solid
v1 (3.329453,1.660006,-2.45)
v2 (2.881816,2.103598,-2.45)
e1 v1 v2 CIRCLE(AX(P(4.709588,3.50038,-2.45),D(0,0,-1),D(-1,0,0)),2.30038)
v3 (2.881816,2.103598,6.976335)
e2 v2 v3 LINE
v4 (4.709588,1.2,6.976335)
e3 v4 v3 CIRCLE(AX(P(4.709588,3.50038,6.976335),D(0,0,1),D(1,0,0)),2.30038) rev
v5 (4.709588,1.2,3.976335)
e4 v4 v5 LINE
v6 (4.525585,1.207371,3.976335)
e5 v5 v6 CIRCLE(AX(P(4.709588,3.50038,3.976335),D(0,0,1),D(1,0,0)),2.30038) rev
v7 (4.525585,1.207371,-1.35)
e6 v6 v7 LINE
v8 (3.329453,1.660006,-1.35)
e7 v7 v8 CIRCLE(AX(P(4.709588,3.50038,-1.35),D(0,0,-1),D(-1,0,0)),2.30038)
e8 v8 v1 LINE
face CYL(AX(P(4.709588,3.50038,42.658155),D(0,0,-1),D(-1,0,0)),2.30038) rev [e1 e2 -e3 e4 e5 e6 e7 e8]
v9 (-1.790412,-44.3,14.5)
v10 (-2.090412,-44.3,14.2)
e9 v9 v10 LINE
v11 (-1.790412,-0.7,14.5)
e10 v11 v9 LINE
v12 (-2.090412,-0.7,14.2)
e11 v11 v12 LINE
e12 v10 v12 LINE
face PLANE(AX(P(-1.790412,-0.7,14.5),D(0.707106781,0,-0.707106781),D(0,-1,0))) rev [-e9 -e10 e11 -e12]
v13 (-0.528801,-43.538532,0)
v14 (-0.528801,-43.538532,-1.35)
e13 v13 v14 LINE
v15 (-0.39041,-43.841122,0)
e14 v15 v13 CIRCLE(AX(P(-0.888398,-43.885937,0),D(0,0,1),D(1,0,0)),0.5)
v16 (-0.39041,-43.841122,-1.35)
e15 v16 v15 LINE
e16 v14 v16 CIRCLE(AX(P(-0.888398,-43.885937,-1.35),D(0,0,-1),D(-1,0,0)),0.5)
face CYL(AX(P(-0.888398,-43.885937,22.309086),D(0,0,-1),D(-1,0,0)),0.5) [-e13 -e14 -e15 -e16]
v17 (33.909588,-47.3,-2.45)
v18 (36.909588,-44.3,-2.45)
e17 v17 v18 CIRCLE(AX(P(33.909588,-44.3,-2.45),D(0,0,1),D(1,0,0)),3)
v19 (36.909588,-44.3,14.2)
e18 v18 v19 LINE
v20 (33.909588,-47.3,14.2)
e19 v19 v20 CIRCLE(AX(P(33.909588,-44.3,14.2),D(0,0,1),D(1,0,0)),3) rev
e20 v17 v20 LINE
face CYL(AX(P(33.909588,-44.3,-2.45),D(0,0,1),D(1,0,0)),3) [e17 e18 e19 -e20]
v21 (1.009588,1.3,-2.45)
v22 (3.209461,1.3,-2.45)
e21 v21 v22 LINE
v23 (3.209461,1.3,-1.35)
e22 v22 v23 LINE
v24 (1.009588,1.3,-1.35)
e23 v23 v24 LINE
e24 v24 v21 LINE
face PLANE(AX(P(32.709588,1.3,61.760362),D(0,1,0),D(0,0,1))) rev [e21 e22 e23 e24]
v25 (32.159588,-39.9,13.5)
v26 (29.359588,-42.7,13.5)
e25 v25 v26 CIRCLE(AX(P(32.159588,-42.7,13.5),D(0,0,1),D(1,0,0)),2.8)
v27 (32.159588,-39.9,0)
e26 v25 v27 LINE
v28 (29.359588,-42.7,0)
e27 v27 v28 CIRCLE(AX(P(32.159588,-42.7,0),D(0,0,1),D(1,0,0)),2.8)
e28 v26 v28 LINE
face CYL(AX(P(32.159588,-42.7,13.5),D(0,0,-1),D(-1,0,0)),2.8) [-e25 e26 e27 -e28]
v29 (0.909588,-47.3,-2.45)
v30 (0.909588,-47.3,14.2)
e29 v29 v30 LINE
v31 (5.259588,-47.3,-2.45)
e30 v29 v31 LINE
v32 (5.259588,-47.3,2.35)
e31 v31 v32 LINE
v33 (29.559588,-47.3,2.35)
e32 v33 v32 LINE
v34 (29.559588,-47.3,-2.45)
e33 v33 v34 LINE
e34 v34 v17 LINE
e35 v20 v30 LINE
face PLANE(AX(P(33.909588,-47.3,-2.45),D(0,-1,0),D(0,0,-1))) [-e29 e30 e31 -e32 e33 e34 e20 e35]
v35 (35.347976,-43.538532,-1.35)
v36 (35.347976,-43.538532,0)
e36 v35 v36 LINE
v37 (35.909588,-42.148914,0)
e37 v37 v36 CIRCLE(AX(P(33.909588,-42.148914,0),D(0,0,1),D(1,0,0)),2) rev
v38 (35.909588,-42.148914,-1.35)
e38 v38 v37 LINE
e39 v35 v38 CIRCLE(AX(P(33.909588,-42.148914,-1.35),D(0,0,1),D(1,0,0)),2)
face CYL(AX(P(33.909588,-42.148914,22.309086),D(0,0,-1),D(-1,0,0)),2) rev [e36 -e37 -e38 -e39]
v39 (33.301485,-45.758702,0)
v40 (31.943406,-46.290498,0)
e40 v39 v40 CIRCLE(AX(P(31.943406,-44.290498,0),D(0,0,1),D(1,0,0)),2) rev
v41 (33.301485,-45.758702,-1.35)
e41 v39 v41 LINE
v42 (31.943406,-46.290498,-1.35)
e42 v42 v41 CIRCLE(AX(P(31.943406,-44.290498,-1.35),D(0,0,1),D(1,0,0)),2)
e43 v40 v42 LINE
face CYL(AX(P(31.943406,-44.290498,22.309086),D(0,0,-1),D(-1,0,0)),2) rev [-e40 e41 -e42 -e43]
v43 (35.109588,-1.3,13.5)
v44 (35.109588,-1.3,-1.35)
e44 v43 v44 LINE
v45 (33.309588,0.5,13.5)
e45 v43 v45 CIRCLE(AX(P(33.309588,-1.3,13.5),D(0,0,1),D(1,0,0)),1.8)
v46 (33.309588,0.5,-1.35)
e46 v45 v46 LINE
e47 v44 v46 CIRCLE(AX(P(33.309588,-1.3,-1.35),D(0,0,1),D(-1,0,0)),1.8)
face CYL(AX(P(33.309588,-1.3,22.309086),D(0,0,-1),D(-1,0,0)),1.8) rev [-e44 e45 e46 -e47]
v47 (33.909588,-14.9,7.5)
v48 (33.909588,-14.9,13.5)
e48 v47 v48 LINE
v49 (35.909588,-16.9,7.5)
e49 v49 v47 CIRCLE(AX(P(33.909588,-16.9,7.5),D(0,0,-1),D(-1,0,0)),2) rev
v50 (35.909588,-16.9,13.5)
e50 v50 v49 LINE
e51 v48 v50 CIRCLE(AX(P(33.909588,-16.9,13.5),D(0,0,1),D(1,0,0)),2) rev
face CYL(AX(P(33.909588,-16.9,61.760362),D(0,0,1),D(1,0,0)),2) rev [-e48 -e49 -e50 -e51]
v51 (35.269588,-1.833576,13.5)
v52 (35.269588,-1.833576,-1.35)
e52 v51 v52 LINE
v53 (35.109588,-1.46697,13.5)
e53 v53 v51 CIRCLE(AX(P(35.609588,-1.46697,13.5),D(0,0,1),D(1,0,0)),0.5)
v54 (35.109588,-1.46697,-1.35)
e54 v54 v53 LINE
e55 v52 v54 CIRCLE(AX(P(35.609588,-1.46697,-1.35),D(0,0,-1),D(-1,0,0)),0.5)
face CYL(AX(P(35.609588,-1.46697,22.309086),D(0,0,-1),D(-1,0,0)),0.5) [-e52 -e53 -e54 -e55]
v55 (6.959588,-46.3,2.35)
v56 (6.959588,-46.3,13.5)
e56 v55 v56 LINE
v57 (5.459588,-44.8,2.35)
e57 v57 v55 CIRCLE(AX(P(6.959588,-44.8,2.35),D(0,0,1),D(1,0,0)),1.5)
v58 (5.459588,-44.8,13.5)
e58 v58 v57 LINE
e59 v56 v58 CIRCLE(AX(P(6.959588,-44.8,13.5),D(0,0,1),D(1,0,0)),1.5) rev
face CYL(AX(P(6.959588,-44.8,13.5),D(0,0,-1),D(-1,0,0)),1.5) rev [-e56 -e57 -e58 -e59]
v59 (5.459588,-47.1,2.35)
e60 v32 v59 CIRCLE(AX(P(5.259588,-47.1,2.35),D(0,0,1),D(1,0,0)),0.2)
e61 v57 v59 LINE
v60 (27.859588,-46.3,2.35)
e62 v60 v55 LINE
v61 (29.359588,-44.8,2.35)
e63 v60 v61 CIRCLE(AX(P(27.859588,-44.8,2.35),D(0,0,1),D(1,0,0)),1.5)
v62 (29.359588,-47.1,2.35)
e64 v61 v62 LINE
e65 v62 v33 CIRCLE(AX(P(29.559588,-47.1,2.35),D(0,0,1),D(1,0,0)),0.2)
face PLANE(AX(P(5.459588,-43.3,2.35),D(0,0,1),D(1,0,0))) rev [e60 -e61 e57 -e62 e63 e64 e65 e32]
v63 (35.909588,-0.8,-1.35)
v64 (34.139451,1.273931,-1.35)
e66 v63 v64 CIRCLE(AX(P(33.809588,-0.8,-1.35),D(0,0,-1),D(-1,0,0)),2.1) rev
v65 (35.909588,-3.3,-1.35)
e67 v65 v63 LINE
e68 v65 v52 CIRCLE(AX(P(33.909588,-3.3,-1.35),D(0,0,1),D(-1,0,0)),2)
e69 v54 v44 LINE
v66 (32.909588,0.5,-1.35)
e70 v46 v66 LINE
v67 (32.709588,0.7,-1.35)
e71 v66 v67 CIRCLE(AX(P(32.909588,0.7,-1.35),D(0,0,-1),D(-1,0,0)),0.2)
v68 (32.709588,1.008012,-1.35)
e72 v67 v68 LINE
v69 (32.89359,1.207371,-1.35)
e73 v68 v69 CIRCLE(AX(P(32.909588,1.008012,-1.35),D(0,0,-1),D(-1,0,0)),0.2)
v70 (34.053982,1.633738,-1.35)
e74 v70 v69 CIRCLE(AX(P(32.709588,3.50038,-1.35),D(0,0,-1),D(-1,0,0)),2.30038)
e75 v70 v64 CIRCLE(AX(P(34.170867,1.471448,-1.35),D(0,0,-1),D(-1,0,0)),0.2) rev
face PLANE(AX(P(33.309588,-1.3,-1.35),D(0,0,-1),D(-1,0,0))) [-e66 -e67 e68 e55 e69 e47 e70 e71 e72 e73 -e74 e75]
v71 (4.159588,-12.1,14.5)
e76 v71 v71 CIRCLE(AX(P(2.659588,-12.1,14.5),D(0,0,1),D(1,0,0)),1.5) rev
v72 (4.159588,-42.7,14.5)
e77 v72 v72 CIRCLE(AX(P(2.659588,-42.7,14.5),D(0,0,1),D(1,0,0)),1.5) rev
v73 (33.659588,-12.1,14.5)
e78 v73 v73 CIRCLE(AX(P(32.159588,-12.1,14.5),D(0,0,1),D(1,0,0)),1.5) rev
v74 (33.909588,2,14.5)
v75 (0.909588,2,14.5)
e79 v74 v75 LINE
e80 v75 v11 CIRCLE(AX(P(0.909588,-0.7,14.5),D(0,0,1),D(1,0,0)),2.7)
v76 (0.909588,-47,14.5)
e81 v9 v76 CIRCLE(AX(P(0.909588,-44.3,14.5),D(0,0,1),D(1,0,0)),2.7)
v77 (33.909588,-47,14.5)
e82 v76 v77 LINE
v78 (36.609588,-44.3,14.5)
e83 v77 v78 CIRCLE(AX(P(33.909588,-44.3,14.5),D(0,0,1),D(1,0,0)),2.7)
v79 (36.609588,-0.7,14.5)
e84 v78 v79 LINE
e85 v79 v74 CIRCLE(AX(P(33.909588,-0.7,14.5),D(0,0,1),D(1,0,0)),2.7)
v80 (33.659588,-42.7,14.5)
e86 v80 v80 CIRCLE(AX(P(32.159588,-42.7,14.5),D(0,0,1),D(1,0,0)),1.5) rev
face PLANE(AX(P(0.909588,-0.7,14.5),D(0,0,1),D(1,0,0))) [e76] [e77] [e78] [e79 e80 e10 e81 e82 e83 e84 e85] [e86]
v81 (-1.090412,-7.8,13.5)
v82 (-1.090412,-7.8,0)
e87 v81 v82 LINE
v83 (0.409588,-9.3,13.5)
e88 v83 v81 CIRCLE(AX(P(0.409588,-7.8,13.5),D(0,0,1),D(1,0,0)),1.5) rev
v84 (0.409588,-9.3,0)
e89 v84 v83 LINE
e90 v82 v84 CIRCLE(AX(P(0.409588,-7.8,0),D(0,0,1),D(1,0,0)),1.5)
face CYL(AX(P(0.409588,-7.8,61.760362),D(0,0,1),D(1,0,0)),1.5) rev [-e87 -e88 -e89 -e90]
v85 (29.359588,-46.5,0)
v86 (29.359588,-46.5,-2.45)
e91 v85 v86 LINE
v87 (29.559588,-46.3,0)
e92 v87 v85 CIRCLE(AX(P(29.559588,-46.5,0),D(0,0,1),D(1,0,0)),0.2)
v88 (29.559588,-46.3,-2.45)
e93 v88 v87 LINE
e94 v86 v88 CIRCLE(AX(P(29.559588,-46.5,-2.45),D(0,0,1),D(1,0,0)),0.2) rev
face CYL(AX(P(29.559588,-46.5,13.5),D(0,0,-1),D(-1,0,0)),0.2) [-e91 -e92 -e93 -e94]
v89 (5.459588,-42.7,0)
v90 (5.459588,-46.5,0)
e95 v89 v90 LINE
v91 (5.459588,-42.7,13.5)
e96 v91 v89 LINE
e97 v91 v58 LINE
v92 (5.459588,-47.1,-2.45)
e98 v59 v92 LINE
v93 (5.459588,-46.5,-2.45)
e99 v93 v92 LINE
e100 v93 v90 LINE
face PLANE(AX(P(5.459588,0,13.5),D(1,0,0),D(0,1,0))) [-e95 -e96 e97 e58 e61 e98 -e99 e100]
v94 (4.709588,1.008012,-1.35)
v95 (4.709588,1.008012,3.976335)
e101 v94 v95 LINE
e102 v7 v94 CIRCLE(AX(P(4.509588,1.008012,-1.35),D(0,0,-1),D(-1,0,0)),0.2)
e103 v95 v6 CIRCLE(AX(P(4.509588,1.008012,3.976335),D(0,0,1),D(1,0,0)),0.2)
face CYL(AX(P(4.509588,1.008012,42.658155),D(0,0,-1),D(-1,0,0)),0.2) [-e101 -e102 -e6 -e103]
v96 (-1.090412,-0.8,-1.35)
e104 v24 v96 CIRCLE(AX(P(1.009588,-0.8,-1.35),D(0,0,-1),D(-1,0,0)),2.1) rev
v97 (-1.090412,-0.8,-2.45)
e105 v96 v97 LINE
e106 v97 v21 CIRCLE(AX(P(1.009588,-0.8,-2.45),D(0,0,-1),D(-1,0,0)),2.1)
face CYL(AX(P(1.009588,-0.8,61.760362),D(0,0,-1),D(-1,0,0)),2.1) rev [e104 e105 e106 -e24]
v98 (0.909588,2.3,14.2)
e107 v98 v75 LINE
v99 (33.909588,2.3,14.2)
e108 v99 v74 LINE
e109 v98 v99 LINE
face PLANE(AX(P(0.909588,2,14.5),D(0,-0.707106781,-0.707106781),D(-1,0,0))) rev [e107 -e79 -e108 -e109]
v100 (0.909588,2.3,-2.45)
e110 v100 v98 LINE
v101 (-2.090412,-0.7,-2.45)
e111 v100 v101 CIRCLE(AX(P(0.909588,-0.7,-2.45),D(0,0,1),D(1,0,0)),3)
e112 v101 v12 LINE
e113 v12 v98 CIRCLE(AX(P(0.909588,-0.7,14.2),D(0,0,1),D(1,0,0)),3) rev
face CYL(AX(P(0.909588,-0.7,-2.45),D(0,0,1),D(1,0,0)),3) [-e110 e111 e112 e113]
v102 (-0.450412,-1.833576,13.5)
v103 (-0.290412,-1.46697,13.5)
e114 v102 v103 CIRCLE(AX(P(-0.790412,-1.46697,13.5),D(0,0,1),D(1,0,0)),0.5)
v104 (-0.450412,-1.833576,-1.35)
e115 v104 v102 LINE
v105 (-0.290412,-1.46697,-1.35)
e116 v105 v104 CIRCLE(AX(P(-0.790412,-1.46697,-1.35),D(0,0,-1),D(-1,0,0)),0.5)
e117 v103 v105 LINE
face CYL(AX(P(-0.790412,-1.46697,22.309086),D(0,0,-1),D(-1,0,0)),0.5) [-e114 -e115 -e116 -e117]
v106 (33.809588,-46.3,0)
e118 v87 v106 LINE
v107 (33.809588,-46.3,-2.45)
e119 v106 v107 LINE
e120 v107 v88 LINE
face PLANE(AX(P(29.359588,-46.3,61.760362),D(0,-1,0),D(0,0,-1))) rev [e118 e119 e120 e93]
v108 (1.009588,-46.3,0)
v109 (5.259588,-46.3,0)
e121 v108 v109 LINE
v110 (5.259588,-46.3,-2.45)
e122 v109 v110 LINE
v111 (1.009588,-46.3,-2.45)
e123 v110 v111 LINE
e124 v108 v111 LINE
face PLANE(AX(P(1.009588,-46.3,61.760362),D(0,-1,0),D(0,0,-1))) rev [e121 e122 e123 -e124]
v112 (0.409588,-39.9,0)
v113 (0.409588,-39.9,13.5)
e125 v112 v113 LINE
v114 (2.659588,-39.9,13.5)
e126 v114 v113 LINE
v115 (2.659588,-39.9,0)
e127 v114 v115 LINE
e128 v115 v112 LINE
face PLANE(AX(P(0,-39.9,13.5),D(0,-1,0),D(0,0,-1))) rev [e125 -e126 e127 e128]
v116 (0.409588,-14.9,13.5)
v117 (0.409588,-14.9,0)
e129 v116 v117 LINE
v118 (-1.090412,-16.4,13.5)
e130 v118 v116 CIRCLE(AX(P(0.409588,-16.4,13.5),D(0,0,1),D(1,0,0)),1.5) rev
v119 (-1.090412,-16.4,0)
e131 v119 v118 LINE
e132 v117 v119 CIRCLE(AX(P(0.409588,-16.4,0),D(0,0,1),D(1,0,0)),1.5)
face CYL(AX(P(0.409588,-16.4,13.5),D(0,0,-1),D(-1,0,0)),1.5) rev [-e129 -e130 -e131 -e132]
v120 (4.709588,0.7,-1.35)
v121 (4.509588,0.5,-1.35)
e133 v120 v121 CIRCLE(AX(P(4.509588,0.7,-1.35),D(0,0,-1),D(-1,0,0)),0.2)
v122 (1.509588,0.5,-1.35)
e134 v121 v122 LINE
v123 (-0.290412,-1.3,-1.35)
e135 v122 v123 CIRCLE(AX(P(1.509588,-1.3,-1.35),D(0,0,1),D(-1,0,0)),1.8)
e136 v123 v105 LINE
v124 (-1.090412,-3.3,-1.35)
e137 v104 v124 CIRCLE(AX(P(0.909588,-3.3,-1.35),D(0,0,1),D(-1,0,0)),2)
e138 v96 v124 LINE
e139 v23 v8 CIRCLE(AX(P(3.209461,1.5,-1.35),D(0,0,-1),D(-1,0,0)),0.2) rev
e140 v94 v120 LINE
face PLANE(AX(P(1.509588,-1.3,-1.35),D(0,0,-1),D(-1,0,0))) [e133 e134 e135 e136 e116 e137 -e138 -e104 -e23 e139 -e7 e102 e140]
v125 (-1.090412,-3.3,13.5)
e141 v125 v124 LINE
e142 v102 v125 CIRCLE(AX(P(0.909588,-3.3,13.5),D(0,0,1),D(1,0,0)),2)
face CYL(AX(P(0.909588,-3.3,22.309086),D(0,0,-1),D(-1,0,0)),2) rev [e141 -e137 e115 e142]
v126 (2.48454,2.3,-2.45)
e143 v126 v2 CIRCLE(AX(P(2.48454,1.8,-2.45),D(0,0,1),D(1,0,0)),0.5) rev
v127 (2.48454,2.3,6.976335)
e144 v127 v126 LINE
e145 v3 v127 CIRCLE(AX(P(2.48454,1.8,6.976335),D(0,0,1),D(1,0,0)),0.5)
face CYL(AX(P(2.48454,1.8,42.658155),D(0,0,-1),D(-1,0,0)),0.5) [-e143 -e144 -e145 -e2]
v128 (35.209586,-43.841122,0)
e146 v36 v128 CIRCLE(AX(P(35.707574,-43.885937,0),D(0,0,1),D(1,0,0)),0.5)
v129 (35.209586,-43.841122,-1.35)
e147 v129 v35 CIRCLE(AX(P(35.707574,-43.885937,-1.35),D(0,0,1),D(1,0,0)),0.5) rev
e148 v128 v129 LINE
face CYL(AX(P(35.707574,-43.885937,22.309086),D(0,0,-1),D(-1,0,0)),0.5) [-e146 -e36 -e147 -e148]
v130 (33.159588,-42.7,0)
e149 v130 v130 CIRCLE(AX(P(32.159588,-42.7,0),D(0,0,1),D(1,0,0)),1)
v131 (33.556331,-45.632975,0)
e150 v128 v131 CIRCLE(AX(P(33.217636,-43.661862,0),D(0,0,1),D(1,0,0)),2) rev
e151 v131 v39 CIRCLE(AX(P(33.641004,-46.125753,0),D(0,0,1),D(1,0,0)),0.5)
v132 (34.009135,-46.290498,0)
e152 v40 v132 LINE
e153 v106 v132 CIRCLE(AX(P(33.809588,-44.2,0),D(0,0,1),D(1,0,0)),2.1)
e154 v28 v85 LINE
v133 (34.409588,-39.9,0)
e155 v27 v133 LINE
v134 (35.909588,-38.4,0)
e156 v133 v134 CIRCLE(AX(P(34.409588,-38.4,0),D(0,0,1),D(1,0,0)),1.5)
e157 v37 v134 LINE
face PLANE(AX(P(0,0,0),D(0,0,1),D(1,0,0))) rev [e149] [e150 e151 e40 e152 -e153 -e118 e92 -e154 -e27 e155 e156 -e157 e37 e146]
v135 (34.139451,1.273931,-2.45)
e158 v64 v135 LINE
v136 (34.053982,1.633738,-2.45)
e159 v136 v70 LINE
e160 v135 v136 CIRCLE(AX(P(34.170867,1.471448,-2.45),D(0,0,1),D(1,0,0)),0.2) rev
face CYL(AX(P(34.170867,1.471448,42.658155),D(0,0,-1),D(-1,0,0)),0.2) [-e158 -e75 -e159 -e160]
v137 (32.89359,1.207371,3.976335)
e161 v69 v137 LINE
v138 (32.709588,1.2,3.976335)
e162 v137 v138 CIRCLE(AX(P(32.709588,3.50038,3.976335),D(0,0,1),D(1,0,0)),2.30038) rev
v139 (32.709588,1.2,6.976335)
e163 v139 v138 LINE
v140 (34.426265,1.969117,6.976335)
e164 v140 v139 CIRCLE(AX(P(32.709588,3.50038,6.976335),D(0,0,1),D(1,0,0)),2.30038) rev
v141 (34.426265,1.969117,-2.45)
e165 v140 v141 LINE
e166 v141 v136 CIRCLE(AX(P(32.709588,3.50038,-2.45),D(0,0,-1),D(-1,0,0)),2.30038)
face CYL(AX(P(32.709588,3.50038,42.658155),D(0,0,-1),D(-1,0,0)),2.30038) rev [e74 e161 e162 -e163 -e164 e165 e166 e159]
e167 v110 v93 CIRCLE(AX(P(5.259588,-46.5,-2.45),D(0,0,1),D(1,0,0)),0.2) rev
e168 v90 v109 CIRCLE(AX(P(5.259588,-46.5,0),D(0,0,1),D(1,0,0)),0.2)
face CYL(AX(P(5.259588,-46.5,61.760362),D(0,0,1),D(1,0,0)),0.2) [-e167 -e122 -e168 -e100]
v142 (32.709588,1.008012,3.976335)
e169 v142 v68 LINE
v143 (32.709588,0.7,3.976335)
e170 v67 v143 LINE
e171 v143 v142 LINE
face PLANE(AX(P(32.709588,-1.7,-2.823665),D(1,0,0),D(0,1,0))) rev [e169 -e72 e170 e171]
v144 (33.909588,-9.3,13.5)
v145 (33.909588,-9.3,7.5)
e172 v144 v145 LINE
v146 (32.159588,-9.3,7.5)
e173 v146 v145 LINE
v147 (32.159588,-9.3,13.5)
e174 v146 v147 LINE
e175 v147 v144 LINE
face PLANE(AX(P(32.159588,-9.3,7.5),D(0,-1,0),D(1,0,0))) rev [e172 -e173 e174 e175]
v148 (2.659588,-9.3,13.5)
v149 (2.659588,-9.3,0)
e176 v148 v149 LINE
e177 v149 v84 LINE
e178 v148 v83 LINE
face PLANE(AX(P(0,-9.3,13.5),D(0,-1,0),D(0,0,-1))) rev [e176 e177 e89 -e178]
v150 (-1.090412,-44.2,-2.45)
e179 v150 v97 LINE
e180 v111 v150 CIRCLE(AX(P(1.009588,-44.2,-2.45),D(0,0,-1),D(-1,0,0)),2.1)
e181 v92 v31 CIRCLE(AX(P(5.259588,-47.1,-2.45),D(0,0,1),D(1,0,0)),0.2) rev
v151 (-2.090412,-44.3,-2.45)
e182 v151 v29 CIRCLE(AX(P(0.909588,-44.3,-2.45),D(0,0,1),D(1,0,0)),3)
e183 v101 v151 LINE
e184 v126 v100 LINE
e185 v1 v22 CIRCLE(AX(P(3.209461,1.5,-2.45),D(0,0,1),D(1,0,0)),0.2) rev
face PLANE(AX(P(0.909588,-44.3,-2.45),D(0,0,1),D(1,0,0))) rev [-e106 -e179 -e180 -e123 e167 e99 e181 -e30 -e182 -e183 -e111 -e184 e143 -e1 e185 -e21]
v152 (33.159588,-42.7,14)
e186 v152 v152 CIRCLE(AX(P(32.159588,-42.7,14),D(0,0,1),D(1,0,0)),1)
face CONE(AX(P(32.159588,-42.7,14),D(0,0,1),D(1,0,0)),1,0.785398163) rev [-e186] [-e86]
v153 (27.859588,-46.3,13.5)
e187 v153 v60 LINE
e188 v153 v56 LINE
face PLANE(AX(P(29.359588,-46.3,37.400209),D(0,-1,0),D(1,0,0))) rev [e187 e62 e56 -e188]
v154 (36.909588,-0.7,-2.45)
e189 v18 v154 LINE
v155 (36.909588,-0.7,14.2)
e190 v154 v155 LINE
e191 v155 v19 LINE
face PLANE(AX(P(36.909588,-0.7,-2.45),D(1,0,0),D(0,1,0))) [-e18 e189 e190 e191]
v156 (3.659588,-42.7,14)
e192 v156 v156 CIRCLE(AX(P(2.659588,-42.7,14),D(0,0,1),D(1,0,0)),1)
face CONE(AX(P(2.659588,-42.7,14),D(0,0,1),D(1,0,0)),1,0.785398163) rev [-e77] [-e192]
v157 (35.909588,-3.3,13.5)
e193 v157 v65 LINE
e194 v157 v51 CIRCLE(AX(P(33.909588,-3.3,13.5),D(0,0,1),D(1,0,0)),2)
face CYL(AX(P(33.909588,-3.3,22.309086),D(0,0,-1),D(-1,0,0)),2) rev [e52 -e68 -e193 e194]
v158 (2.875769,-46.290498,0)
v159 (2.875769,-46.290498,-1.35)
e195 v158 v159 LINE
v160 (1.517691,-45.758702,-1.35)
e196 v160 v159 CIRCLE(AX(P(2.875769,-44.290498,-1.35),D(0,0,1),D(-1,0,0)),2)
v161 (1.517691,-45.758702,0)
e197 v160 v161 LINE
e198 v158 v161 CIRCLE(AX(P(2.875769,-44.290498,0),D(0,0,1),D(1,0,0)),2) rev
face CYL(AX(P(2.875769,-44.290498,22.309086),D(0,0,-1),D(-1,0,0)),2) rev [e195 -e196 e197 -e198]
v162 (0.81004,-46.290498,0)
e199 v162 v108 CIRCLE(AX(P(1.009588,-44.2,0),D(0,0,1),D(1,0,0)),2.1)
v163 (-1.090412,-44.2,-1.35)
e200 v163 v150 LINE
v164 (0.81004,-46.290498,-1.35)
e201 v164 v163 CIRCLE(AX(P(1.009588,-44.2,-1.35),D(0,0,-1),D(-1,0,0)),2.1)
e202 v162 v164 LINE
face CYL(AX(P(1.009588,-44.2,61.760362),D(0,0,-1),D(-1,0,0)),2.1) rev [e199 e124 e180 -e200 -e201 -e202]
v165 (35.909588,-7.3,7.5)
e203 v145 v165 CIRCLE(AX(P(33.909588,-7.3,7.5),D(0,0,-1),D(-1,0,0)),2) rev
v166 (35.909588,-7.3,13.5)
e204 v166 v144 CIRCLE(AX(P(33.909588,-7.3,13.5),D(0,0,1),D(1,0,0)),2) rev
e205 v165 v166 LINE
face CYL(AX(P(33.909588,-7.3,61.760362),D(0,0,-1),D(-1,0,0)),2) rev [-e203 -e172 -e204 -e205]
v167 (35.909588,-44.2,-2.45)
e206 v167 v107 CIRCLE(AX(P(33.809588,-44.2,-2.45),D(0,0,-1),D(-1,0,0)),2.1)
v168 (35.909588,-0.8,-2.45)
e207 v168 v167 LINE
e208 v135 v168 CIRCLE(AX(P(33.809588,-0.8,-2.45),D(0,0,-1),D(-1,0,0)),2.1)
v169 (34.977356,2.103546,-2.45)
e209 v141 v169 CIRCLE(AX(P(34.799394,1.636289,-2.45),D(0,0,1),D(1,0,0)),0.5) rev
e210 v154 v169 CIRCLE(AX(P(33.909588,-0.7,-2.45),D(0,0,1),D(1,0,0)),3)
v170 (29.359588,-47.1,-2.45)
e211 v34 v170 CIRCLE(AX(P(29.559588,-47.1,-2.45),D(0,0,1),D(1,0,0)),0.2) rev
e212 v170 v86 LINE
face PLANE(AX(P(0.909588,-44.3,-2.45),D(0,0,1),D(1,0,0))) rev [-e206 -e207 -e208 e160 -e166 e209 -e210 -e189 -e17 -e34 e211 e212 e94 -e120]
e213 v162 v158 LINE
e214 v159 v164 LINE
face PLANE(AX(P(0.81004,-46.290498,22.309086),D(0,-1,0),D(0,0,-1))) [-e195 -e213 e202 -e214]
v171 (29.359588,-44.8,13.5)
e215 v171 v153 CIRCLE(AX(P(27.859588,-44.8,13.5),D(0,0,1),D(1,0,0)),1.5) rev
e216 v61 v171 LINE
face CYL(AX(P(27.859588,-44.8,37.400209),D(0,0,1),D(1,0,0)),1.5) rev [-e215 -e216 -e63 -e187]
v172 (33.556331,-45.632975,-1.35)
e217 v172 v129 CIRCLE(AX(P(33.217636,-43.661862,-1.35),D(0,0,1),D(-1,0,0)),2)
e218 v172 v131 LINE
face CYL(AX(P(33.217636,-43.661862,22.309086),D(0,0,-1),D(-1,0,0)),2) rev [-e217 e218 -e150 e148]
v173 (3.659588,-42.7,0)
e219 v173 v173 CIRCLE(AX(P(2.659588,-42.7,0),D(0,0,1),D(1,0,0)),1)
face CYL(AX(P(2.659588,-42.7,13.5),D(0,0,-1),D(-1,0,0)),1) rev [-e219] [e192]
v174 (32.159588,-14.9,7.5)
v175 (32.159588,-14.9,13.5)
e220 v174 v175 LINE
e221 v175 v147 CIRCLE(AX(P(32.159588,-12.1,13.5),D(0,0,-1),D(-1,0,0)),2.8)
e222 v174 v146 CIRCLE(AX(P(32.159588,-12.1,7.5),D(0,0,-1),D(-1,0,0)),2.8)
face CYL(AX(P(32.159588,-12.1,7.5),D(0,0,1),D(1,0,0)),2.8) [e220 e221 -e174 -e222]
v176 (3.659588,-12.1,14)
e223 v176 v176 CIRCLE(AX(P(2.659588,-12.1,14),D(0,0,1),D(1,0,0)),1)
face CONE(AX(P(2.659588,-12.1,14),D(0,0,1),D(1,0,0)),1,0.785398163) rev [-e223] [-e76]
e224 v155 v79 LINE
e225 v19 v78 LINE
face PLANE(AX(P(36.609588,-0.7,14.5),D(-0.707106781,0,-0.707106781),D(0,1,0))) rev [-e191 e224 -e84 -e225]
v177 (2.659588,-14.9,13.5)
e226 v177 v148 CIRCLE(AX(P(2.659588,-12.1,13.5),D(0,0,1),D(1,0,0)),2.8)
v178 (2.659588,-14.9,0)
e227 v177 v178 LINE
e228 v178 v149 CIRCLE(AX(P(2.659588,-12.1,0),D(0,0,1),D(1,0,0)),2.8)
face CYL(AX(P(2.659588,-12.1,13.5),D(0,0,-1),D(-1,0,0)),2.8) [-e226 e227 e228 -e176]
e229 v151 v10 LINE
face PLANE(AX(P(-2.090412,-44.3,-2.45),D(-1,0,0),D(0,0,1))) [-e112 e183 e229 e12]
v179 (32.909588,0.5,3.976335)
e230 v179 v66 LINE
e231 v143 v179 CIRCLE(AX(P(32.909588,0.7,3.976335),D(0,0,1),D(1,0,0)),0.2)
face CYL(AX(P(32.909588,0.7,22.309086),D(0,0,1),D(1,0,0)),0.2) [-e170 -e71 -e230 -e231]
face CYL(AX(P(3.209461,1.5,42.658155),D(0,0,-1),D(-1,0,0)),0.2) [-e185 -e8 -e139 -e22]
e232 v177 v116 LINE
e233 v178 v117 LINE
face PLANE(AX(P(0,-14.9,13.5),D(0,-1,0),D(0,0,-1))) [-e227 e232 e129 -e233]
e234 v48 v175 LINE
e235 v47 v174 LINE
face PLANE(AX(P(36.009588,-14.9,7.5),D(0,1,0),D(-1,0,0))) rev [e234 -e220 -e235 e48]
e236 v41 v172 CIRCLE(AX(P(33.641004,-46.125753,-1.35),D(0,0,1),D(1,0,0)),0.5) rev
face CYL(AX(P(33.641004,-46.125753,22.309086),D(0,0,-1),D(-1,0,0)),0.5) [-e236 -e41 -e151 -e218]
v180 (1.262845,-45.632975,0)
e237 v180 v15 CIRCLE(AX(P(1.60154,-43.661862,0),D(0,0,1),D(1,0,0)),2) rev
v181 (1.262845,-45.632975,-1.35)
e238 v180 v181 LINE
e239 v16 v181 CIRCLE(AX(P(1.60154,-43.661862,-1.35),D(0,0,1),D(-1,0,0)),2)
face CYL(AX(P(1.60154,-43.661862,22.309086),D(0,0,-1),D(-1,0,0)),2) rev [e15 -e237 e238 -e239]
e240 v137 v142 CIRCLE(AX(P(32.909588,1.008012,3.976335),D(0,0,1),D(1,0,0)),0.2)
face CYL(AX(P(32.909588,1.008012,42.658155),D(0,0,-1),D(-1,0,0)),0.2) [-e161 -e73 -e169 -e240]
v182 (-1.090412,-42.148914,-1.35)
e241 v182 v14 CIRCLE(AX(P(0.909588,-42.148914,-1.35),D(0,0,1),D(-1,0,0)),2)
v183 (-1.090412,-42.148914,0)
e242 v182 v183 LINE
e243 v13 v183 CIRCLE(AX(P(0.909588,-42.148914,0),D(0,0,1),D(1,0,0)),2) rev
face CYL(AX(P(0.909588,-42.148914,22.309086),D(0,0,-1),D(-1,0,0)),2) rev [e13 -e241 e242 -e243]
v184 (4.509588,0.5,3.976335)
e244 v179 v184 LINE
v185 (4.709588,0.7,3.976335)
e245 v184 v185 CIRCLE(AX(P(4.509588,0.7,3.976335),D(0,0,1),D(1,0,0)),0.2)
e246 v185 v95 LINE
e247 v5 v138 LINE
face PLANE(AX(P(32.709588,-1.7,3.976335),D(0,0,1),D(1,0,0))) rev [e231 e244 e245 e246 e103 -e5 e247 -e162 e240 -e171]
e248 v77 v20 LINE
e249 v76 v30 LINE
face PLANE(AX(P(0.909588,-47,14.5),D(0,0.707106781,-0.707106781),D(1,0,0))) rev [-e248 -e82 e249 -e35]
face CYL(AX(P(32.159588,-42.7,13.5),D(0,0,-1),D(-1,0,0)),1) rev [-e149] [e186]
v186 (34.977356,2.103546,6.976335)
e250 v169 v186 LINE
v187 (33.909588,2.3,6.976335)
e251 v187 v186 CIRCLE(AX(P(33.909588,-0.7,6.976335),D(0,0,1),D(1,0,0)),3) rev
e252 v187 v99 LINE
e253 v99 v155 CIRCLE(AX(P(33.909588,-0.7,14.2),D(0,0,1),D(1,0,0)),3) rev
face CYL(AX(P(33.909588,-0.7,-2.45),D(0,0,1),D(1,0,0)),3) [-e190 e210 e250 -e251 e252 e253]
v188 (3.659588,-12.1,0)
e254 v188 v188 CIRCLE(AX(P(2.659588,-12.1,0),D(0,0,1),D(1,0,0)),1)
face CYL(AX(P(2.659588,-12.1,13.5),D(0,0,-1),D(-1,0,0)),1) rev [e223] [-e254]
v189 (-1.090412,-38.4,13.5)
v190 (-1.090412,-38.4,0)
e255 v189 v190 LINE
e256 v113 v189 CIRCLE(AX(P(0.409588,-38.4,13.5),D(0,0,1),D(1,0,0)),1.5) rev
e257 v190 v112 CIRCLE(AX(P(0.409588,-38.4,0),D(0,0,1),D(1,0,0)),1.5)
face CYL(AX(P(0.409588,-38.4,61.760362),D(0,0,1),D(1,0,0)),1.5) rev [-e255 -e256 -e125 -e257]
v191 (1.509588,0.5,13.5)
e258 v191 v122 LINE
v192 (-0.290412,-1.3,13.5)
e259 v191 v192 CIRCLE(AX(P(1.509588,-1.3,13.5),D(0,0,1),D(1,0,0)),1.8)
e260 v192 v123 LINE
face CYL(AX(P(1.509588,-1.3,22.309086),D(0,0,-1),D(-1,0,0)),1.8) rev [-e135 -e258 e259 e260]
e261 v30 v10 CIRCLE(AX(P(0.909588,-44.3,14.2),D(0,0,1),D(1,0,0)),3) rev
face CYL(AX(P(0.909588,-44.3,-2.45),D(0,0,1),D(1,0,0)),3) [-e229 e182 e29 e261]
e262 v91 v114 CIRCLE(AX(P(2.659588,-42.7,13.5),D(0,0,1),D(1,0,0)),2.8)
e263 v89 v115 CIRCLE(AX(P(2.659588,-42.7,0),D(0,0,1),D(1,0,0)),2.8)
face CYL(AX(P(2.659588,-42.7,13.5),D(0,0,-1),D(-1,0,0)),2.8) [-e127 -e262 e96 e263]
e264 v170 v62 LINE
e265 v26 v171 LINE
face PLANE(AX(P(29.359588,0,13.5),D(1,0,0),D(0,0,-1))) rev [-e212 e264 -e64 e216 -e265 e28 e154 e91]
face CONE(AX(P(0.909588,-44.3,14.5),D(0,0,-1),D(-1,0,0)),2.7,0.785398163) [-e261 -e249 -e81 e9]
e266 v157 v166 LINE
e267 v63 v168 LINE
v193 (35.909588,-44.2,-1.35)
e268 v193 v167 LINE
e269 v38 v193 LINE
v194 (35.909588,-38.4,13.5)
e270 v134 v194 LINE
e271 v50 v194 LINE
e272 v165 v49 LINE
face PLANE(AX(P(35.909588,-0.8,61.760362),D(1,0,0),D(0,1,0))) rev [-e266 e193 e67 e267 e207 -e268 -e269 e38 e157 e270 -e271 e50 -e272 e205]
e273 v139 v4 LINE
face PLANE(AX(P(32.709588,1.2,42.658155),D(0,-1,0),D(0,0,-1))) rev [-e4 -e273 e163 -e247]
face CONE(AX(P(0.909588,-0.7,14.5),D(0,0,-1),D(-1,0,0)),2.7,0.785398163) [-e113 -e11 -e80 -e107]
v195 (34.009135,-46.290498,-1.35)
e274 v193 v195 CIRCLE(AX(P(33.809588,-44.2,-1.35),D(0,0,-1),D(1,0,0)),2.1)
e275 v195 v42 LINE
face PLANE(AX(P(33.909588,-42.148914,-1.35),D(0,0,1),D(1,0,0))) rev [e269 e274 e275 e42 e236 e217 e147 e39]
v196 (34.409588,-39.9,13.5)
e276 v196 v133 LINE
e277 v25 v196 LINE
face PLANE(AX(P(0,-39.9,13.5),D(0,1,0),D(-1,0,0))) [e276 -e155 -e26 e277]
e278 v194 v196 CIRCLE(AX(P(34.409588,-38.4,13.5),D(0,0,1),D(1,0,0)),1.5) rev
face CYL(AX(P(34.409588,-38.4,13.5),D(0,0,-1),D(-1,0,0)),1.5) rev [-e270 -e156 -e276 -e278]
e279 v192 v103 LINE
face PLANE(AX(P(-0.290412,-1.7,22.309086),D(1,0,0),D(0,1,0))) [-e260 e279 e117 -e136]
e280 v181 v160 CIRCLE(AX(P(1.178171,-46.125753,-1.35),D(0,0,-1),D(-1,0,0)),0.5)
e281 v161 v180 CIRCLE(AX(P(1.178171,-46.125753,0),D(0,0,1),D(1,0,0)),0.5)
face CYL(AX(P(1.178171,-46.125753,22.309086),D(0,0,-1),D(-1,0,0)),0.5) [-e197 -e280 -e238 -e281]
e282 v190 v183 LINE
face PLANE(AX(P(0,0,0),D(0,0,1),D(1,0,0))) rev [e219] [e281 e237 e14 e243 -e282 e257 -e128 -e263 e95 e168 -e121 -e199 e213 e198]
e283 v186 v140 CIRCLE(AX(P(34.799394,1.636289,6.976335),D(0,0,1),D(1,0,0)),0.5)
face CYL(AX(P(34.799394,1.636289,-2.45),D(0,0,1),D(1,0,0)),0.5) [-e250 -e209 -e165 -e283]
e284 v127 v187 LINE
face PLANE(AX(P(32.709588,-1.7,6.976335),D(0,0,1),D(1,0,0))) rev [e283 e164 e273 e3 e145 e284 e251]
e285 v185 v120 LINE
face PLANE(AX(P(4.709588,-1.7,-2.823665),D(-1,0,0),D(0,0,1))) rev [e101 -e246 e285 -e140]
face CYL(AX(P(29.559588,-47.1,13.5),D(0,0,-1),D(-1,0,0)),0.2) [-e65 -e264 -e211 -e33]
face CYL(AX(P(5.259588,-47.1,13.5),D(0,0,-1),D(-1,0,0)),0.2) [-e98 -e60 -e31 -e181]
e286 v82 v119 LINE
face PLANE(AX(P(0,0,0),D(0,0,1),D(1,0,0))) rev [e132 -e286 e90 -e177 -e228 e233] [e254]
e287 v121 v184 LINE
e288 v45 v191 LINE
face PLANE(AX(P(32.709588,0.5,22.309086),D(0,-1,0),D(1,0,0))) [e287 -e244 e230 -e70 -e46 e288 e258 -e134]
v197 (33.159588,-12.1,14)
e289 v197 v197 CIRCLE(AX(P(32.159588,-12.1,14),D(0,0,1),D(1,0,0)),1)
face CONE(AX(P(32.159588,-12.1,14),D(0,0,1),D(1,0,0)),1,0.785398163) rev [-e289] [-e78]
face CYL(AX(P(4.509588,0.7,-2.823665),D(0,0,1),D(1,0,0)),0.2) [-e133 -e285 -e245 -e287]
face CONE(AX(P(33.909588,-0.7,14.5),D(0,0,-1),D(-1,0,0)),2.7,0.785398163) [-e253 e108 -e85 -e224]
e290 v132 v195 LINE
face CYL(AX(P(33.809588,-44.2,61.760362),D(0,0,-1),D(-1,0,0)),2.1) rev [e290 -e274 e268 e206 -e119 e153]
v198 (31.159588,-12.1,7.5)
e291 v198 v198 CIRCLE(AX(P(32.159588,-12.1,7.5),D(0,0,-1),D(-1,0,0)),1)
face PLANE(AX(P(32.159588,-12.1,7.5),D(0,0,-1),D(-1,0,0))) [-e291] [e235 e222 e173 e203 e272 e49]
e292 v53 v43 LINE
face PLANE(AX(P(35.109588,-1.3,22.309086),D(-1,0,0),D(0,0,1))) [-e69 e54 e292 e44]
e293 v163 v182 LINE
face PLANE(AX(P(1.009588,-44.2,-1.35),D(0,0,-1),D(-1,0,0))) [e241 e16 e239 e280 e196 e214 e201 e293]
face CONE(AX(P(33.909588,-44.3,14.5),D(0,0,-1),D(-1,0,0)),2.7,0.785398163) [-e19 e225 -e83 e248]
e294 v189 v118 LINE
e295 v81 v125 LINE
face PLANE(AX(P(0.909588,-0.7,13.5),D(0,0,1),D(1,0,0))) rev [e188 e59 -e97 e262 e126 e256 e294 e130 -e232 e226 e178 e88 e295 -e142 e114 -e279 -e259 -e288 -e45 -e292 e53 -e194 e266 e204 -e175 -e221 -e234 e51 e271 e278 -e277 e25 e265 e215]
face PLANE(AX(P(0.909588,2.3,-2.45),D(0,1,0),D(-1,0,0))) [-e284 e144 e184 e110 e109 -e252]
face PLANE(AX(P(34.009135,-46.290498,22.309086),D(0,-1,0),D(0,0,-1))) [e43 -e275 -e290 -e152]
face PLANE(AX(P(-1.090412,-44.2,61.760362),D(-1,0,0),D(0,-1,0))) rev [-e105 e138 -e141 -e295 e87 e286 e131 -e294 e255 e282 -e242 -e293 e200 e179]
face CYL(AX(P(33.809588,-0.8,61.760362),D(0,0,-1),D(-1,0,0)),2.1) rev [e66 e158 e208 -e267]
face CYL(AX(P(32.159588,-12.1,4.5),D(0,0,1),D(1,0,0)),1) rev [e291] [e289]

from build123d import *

# Parameters (mm, degrees)
EXTRUDE_1_DEPTH     = 2.45
EXTRUDE_START       = 13.5
SKETCH_2_R          = 1
EXTRUDE_2_DEPTH     = 13.5
EXTRUDE_START_2     = 1
SKETCH_3_R          = 1
EXTRUDE_3_DEPTH     = 1
SKETCH_4_W          = 23.9
SKETCH_4_H          = 5.2
CUT_EXTRUDE_1_DEPTH = 4
SKETCH_5_W          = 28
SKETCH_5_H          = 6.8
CUT_EXTRUDE_2_DEPTH = 4
SKETCH_6_R          = 1
CUT_EXTRUDE_3_DEPTH = 10
SKETCH_8_R          = 1
EXTRUDE_4_DEPTH     = 6
EXTRUDE_1_2_REACH   = 64.345
SKETCH_14_W         = 28
SKETCH_14_H         = 0.1
EXTRUDE_2_2_DEPTH   = 9.523664952
SKETCH_15_W         = 23.9
SKETCH_15_H         = 0.1
EXTRUDE_3_2_DEPTH   = 11.15
EXTRUDE_5_REACH     = 64.055
SKETCH_12_W         = 28
SKETCH_12_H         = 1.8
EXTRUDE_6_DEPTH     = 9.523664952
CUT_EXTRUDE_4_DEPTH = 9.426335048
FILLET_1_R          = 0.5
FILLET_2_R          = 0.2
FILLET_3_R          = 1.5
FILLET_4_R          = 2
CHAMFER_1_SIZE      = 0.3
CHAMFER_2_SIZE      = 0.5


with BuildPart() as part:
    # Эскиз1 → Extrude 1 (new body)
    with BuildSketch(Plane.XY):
        with BuildLine():
            Line((33.90958774, -47.3), (0.90958774, -47.3))
            ThreePointArc((0.90958774, -47.3), (-1.211732603, -46.421320344), (-2.09041226, -44.3))
            Line((-2.09041226, -44.3), (-2.09041226, -0.7))
            ThreePointArc((-2.09041226, -0.7), (-1.211732603, 1.421320344), (0.90958774, 2.3))
            Line((0.90958774, 2.3), (33.90958774, 2.3))
            ThreePointArc((33.90958774, 2.3), (36.030908084, 1.421320344), (36.90958774, -0.7))
            Line((36.90958774, -0.7), (36.90958774, -44.3))
            ThreePointArc((36.90958774, -44.3), (36.030908084, -46.421320344), (33.90958774, -47.3))
        make_face()
        with BuildLine():
            Line((33.80958774, -46.4), (1.00958774, -46.4))
            ThreePointArc((1.00958774, -46.4), (-0.546047178, -45.755634919), (-1.19041226, -44.2))
            Line((-1.19041226, -44.2), (-1.19041226, -0.8))
            ThreePointArc((-1.19041226, -0.8), (-0.546047178, 0.755634919), (1.00958774, 1.4))
            Line((1.00958774, 1.4), (33.80958774, 1.4))
            ThreePointArc((33.80958774, 1.4), (35.365222659, 0.755634919), (36.00958774, -0.8))
            Line((36.00958774, -0.8), (36.00958774, -44.2))
            ThreePointArc((36.00958774, -44.2), (35.365222659, -45.755634919), (33.80958774, -46.4))
        make_face(mode=Mode.SUBTRACT)
    extrude(amount=-EXTRUDE_1_DEPTH)

    # Эскиз2 → Extrude 2 (add)
    with BuildSketch(Plane.XY.offset(EXTRUDE_START)):
        with BuildLine():
            ThreePointArc((-2.09041226, -44.3), (-1.211732603, -46.421320344), (0.90958774, -47.3))
            Line((0.90958774, -47.3), (33.90958774, -47.3))
            ThreePointArc((33.90958774, -47.3), (36.030908084, -46.421320344), (36.90958774, -44.3))
            Line((36.90958774, -44.3), (36.90958774, -0.7))
            ThreePointArc((36.90958774, -0.7), (36.030908084, 1.421320344), (33.90958774, 2.3))
            Line((33.90958774, 2.3), (0.90958774, 2.3))
            ThreePointArc((0.90958774, 2.3), (-1.211732603, 1.421320344), (-2.09041226, -0.7))
            Line((-2.09041226, -0.7), (-2.09041226, -39.9))
            Line((-2.09041226, -39.9), (-2.09041226, -44.3))
        make_face()
        with Locations((2.65958774, -42.7)):
            Circle(SKETCH_2_R, mode=Mode.SUBTRACT)
        with Locations((2.65958774, -12.1)):
            Circle(SKETCH_2_R, mode=Mode.SUBTRACT)
        with BuildLine():
            Line((2.65958774, -39.9), (-1.19041226, -39.9))
            Line((-1.19041226, -39.9), (-1.19041226, -14.9))
            Line((-1.19041226, -14.9), (2.65958774, -14.9))
            ThreePointArc((2.65958774, -14.9), (5.45958774, -12.1), (2.65958774, -9.3))
            Line((2.65958774, -9.3), (-1.19041226, -9.3))
            Line((-1.19041226, -9.3), (-1.19041226, -0.8))
            ThreePointArc((-1.19041226, -0.8), (-0.546047178, 0.755634919), (1.00958774, 1.4))
            Line((1.00958774, 1.4), (33.80958774, 1.4))
            ThreePointArc((33.80958774, 1.4), (35.365222659, 0.755634919), (36.00958774, -0.8))
            Line((36.00958774, -0.8), (36.00958774, -39.9))
            Line((36.00958774, -39.9), (32.15958774, -39.9))
            ThreePointArc((32.15958774, -39.9), (30.179688753, -40.720101013), (29.35958774, -42.7))
            Line((29.35958774, -42.7), (29.35958774, -46.4))
            Line((29.35958774, -46.4), (5.45958774, -46.4))
            Line((5.45958774, -46.4), (5.45958774, -42.7))
            ThreePointArc((5.45958774, -42.7), (4.639486728, -40.720101013), (2.65958774, -39.9))
        make_face(mode=Mode.SUBTRACT)
        with Locations((32.15958774, -42.7)):
            Circle(SKETCH_2_R, mode=Mode.SUBTRACT)
    extrude(amount=-EXTRUDE_2_DEPTH)

    # Эскиз3 → Extrude 3 (add)
    with BuildSketch(Plane.XY.offset(13.5).offset(EXTRUDE_START_2)):
        with BuildLine():
            Line((-2.09041226, -0.7), (-2.09041226, -44.3))
            ThreePointArc((-2.09041226, -44.3), (-1.211732603, -46.421320344), (0.90958774, -47.3))
            Line((0.90958774, -47.3), (33.90958774, -47.3))
            ThreePointArc((33.90958774, -47.3), (36.030908084, -46.421320344), (36.90958774, -44.3))
            Line((36.90958774, -44.3), (36.90958774, -0.7))
            ThreePointArc((36.90958774, -0.7), (36.030908084, 1.421320344), (33.90958774, 2.3))
            Line((33.90958774, 2.3), (0.90958774, 2.3))
            ThreePointArc((0.90958774, 2.3), (-1.211732603, 1.421320344), (-2.09041226, -0.7))
        make_face()
        with Locations((2.65958774, -42.7)):
            Circle(SKETCH_3_R, mode=Mode.SUBTRACT)
        with Locations((2.65958774, -12.1)):
            Circle(SKETCH_3_R, mode=Mode.SUBTRACT)
        with Locations((32.15958774, -42.7)):
            Circle(SKETCH_3_R, mode=Mode.SUBTRACT)
    extrude(amount=-EXTRUDE_3_DEPTH)

    # Эскиз4 → Вырез-Вытянуть1 (cut)
    with BuildSketch(Plane.XZ.offset(47.3)):
        with Locations((17.40958774, -0.25)):
            Rectangle(SKETCH_4_W, SKETCH_4_H)
    extrude(amount=-CUT_EXTRUDE_1_DEPTH, mode=Mode.SUBTRACT)

    # Эскиз5 → Вырез-Вытянуть2 (cut)
    with BuildSketch(Plane(origin=(0, 2.3, 0), x_dir=(1, 0, 0), z_dir=(0, 1, 0))):
        with Locations((18.70958774, -0.576335048)):
            Rectangle(SKETCH_5_W, SKETCH_5_H)
    extrude(amount=-CUT_EXTRUDE_2_DEPTH, mode=Mode.SUBTRACT)

    # Эскиз6 → Вырез-Вытянуть3 (cut)
    with BuildSketch(Plane.XY.offset(14.5)):
        with Locations((32.15958774, -12.1)):
            Circle(SKETCH_6_R)
    extrude(amount=-CUT_EXTRUDE_3_DEPTH, mode=Mode.SUBTRACT)

    # Эскиз8 → Бобышка-Вытянуть4 (add)
    with BuildSketch(Plane(origin=(0, 0, 13.5), x_dir=(-1, 0, 0), z_dir=(0, 0, -1))):
        with BuildLine():
            Line((-32.15958774, -9.3), (-36.00958774, -9.3))
            Line((-36.00958774, -9.3), (-36.00958774, -14.9))
            Line((-36.00958774, -14.9), (-32.15958774, -14.9))
            ThreePointArc((-32.15958774, -14.9), (-29.35958774, -12.1), (-32.15958774, -9.3))
        make_face()
        with Locations(Location((-32.15958774, -12.1, 0), (0, 0, 180))):
            Circle(SKETCH_8_R, mode=Mode.SUBTRACT)
    extrude(amount=EXTRUDE_4_DEPTH)

    # Extrude 1 2: up to this face of the body (flat: up to its plane)
    extrude_1_2_end = Plane(part.part.faces().sort_by_distance((17.40958774, -21.902362375, 13.5))[0])
    # Эскиз13 → Extrude 1 2 (add, up to the picked face)
    with BuildSketch(Plane(origin=(0, 0, -2.45), x_dir=(-1, 0, 0), z_dir=(0, 0, -1)), mode=Mode.PRIVATE) as extrude_1_2_sk1:
        with BuildLine():
            Line((-5.45958774, -46.4), (-1.00958774, -46.4))
            ThreePointArc((-1.00958774, -46.4), (0.546047178, -45.755634919), (1.19041226, -44.2))
            Line((1.19041226, -44.2), (1.19041226, -0.8))
            ThreePointArc((1.19041226, -0.8), (0.546047178, 0.755634919), (-1.00958774, 1.4))
            Line((-1.00958774, 1.4), (-4.70958774, 1.4))
            Line((-4.70958774, 1.4), (-4.70958774, 1.3))
            Line((-4.70958774, 1.3), (-1.00958774, 1.3))
            ThreePointArc((-1.00958774, 1.3), (0.4753365, 0.68492424), (1.09041226, -0.8))
            Line((1.09041226, -0.8), (1.09041226, -44.2))
            ThreePointArc((1.09041226, -44.2), (0.4753365, -45.68492424), (-1.00958774, -46.3))
            Line((-1.00958774, -46.3), (-5.45958774, -46.3))
            Line((-5.45958774, -46.3), (-5.45958774, -46.4))
        make_face()
    extrude_1_2_tool1 = split(extrude(extrude_1_2_sk1.sketch, amount=-EXTRUDE_1_2_REACH, mode=Mode.PRIVATE), bisect_by=extrude_1_2_end, keep=Keep.BOTH, mode=Mode.PRIVATE)
    # Эскиз13 → Extrude 1 2 (add, up to the picked face)
    with BuildSketch(Plane(origin=(0, 0, -2.45), x_dir=(-1, 0, 0), z_dir=(0, 0, -1)), mode=Mode.PRIVATE) as extrude_1_2_sk2:
        with BuildLine():
            Line((-32.70958774, 1.4), (-33.80958774, 1.4))
            ThreePointArc((-33.80958774, 1.4), (-35.365222659, 0.755634919), (-36.00958774, -0.8))
            Line((-36.00958774, -0.8), (-36.00958774, -44.2))
            ThreePointArc((-36.00958774, -44.2), (-35.365222659, -45.755634919), (-33.80958774, -46.4))
            Line((-33.80958774, -46.4), (-29.35958774, -46.4))
            Line((-29.35958774, -46.4), (-29.35958774, -46.3))
            Line((-29.35958774, -46.3), (-33.80958774, -46.3))
            ThreePointArc((-33.80958774, -46.3), (-35.294511981, -45.68492424), (-35.90958774, -44.2))
            Line((-35.90958774, -44.2), (-35.90958774, -0.8))
            ThreePointArc((-35.90958774, -0.8), (-35.294511981, 0.68492424), (-33.80958774, 1.3))
            Line((-33.80958774, 1.3), (-32.70958774, 1.3))
            Line((-32.70958774, 1.3), (-32.70958774, 1.4))
        make_face()
    extrude_1_2_tool2 = split(extrude(extrude_1_2_sk2.sketch, amount=-EXTRUDE_1_2_REACH, mode=Mode.PRIVATE), bisect_by=extrude_1_2_end, keep=Keep.BOTH, mode=Mode.PRIVATE)
    add(extrude_1_2_tool1.solids().sort_by(Axis((-0.509462, -45.719049, -2.45), (0, 0, 1)))[0])
    add(extrude_1_2_tool2.solids().sort_by(Axis((35.328637, 0.719049, -2.45), (0, 0, 1)))[0])

    # Эскиз14 → Extrude 2 2 (add)
    with BuildSketch(Plane(origin=(0, 0, 3.976335048), x_dir=(-1, 0, 0), z_dir=(0, 0, -1))):
        with Locations((-18.70958774, 1.35)):
            Rectangle(SKETCH_14_W, SKETCH_14_H)
    extrude(amount=-EXTRUDE_2_2_DEPTH)

    # Эскиз15 → Extrude 3 2 (add)
    with BuildSketch(Plane(origin=(0, 0, 2.35), x_dir=(-1, 0, 0), z_dir=(0, 0, -1))):
        with Locations((-17.40958774, -46.35)):
            Rectangle(SKETCH_15_W, SKETCH_15_H)
    extrude(amount=-EXTRUDE_3_2_DEPTH)

    # Бобышка-Вытянуть5: up to this face of the body (flat: up to its plane)
    extrude_5_end = Plane(part.part.faces().sort_by_distance((17.40958774, -21.923561219, 13.5))[0])
    # Эскиз9 → Бобышка-Вытянуть5 (add, up to the picked face)
    with BuildSketch(Plane(origin=(0, 0, -1.35), x_dir=(-1, 0, 0), z_dir=(0, 0, -1)), mode=Mode.PRIVATE) as extrude_5_sk1:
        with BuildLine():
            Line((-0.810040229, -46.290497738), (-2.875769072, -46.290497738))
            ThreePointArc((-2.875769072, -46.290497738), (-2.07721679, -46.124159171), (-1.41149455, -45.652811991))
            ThreePointArc((-1.41149455, -45.652811991), (-0.121659652, -45.007207353), (0.398460201, -43.661861765))
            ThreePointArc((0.398460201, -43.661861765), (0.909216246, -42.980750675), (1.09041226, -42.148914118))
            Line((1.09041226, -42.148914118), (1.09041226, -44.2))
            ThreePointArc((1.09041226, -44.2), (0.544286414, -45.612612867), (-0.810040229, -46.290497738))
        make_face()
    extrude_5_tool1 = split(extrude(extrude_5_sk1.sketch, amount=-EXTRUDE_5_REACH, mode=Mode.PRIVATE), bisect_by=extrude_5_end, keep=Keep.BOTH, mode=Mode.PRIVATE)
    # Эскиз9 → Бобышка-Вытянуть5 (add, up to the picked face)
    with BuildSketch(Plane(origin=(0, 0, -1.35), x_dir=(-1, 0, 0), z_dir=(0, 0, -1)), mode=Mode.PRIVATE) as extrude_5_sk2:
        with BuildLine():
            Line((-35.90958774, -44.2), (-35.90958774, -42.148914118))
            ThreePointArc((-35.90958774, -42.148914118), (-35.728391727, -42.980750675), (-35.217635682, -43.661861765))
            ThreePointArc((-35.217635682, -43.661861765), (-34.697515829, -45.007207353), (-33.407680931, -45.652811991))
            ThreePointArc((-33.407680931, -45.652811991), (-32.741958691, -46.124159171), (-31.943406409, -46.290497738))
            Line((-31.943406409, -46.290497738), (-34.009135252, -46.290497738))
            ThreePointArc((-34.009135252, -46.290497738), (-35.363461895, -45.612612867), (-35.90958774, -44.2))
        make_face()
    extrude_5_tool2 = split(extrude(extrude_5_sk2.sketch, amount=-EXTRUDE_5_REACH, mode=Mode.PRIVATE), bisect_by=extrude_5_end, keep=Keep.BOTH, mode=Mode.PRIVATE)
    # Эскиз9 → Бобышка-Вытянуть5 (add, up to the picked face)
    with BuildSketch(Plane(origin=(0, 0, -1.35), x_dir=(-1, 0, 0), z_dir=(0, 0, -1)), mode=Mode.PRIVATE) as extrude_5_sk3:
        with BuildLine():
            Line((-32.70958774, 0.5), (-33.30958774, 0.5))
            ThreePointArc((-33.30958774, 0.5), (-34.582379947, -0.027207794), (-35.10958774, -1.3))
            Line((-35.10958774, -1.3), (-35.10958774, -1.7))
            ThreePointArc((-35.10958774, -1.7), (-35.698442122, -2.405572809), (-35.90958774, -3.3))
            Line((-35.90958774, -3.3), (-36.90958774, -0.7))
            ThreePointArc((-36.90958774, -0.7), (-36.030908084, 1.421320344), (-33.90958774, 2.3))
            Line((-33.90958774, 2.3), (-32.70958774, 2.3))
            Line((-32.70958774, 2.3), (-32.70958774, 1.2))
            Line((-32.70958774, 1.2), (-32.70958774, 0.5))
        make_face()
    extrude_5_tool3 = split(extrude(extrude_5_sk3.sketch, amount=-EXTRUDE_5_REACH, mode=Mode.PRIVATE), bisect_by=extrude_5_end, keep=Keep.BOTH, mode=Mode.PRIVATE)
    # Эскиз9 → Бобышка-Вытянуть5 (add, up to the picked face)
    with BuildSketch(Plane(origin=(0, 0, -1.35), x_dir=(-1, 0, 0), z_dir=(0, 0, -1)), mode=Mode.PRIVATE) as extrude_5_sk4:
        with BuildLine():
            Line((-1.50958774, 0.5), (-4.70958774, 0.5))
            Line((-4.70958774, 0.5), (-4.70958774, 1.2))
            Line((-4.70958774, 1.2), (-4.70958774, 2.3))
            Line((-4.70958774, 2.3), (-0.90958774, 2.3))
            ThreePointArc((-0.90958774, 2.3), (1.211732603, 1.421320344), (2.09041226, -0.7))
            Line((2.09041226, -0.7), (1.09041226, -3.3))
            ThreePointArc((1.09041226, -3.3), (0.879266642, -2.405572809), (0.29041226, -1.7))
            Line((0.29041226, -1.7), (0.29041226, -1.3))
            ThreePointArc((0.29041226, -1.3), (-0.236795534, -0.027207794), (-1.50958774, 0.5))
        make_face()
    extrude_5_tool4 = split(extrude(extrude_5_sk4.sketch, amount=-EXTRUDE_5_REACH, mode=Mode.PRIVATE), bisect_by=extrude_5_end, keep=Keep.BOTH, mode=Mode.PRIVATE)
    add(extrude_5_tool1.solids().sort_by(Axis((0.020604, -45.07512, -1.35), (0, 0, 1)))[0])
    add(extrude_5_tool2.solids().sort_by(Axis((34.798571, -45.07512, -1.35), (0, 0, 1)))[0])
    add(extrude_5_tool3.solids().sort_by(Axis((35.039178, 0.318061, -1.35), (0, 0, 1)))[0])
    add(extrude_5_tool4.solids().sort_by(Axis((0.865444, 0.64162, -1.35), (0, 0, 1)))[0])

    # Эскиз12 → Бобышка-Вытянуть6 (add)
    with BuildSketch(Plane(origin=(0, 0, 3.976335048), x_dir=(-1, 0, 0), z_dir=(0, 0, -1))):
        with Locations((-18.70958774, 1.4)):
            Rectangle(SKETCH_12_W, SKETCH_12_H)
    extrude(amount=-EXTRUDE_6_DEPTH)

    # Эскиз11 → Вырез-Вытянуть4 (cut)
    with BuildSketch(Plane(origin=(0, 0, -2.45), x_dir=(-1, 0, 0), z_dir=(0, 0, -1))):
        with BuildLine():
            Line((-35.009968097, 3.500380356), (-2.409207384, 3.500380356))
            ThreePointArc((-2.409207384, 3.500380356), (-3.082973191, 1.873765807), (-4.70958774, 1.2))
            Line((-4.70958774, 1.2), (-32.70958774, 1.2))
            ThreePointArc((-32.70958774, 1.2), (-34.33620229, 1.873765807), (-35.009968097, 3.500380356))
        make_face()
    extrude(amount=-CUT_EXTRUDE_4_DEPTH, mode=Mode.SUBTRACT)

    # Скругление1
    fillet_1_edges = [part.edges().sort_by_distance(p)[0] for p in [
        (35.10958774, -1.7, 6.075),
        (-0.29041226, -1.7, 6.075),
        (1.41149455, -45.652811991, -0.675),
        (-0.398460201, -43.661861765, -0.675),
        (33.407680931, -45.652811991, -0.675),
        (35.217635682, -43.661861765, -0.675),
        (34.61753128, 2.215272877, 2.263167524),
        (2.747232833, 2.3, 2.263167524),
    ]]
    fillet(fillet_1_edges, radius=FILLET_1_R)

    # Скругление2
    # the kernel refuses this fillet: 0.2 mm, written as the material it takes off along each edge
    with BuildSketch(Plane(origin=(29.35958774, -47.3, -2.95), x_dir=(1, 0, 0), z_dir=(0, 0, 1))) as fillet_2_piece_1:
        with BuildLine():
            CenterArc((FILLET_2_R, FILLET_2_R), FILLET_2_R, 180, 90)
            Line((0, FILLET_2_R), (0, 0))
            Line((0, 0), (FILLET_2_R, 0))
        make_face()
    extrude(amount=5.3, mode=Mode.SUBTRACT)
    with BuildSketch(Plane(origin=(5.45958774, -47.3, 2.35), x_dir=(0, 1, 0), z_dir=(0, 0, -1))) as fillet_2_piece_2:
        with BuildLine():
            CenterArc((FILLET_2_R, -FILLET_2_R), FILLET_2_R, 90, 90)
            Line((0, -FILLET_2_R), (0, 0))
            Line((0, 0), (FILLET_2_R, 0))
        make_face()
    extrude(amount=5.3, mode=Mode.SUBTRACT)
    with BuildSketch(Plane(origin=(29.35958774, -46.3, -2.95), x_dir=(0, -1, 0), z_dir=(0, 0, 1))) as fillet_2_piece_3:
        with BuildLine():
            CenterArc((FILLET_2_R, FILLET_2_R), FILLET_2_R, 180, 90)
            Line((0, FILLET_2_R), (0, 0))
            Line((0, 0), (FILLET_2_R, 0))
        make_face()
    extrude(amount=2.95, mode=Mode.SUBTRACT)
    with BuildSketch(Plane(origin=(5.45958774, -46.3, -2.95), x_dir=(0, -1, 0), z_dir=(0, 0, 1))) as fillet_2_piece_4:
        with BuildLine():
            CenterArc((FILLET_2_R, -FILLET_2_R), FILLET_2_R, 90, 90)
            Line((0, -FILLET_2_R), (0, 0))
            Line((0, 0), (FILLET_2_R, 0))
        make_face()
    extrude(amount=2.95, mode=Mode.SUBTRACT)
    with BuildSketch(Plane(origin=(4.70958774, 0.5, -1.85), x_dir=(0, 1, 0), z_dir=(0, 0, 1))) as fillet_2_piece_5:
        with BuildLine():
            CenterArc((FILLET_2_R, FILLET_2_R), FILLET_2_R, 180, 90)
            Line((0, FILLET_2_R), (0, 0))
            Line((0, 0), (FILLET_2_R, 0))
        make_face()
    extrude(amount=5.826335048, mode=Mode.SUBTRACT)
    with BuildSketch(Plane(origin=(32.70958774, 0.5, -1.85), x_dir=(0, 1, 0), z_dir=(0, 0, 1))) as fillet_2_piece_6:
        with BuildLine():
            CenterArc((FILLET_2_R, -FILLET_2_R), FILLET_2_R, 90, 90)
            Line((0, -FILLET_2_R), (0, 0))
            Line((0, 0), (FILLET_2_R, 0))
        make_face()
    extrude(amount=5.826335048, mode=Mode.SUBTRACT)
    with BuildSketch(Plane(origin=(32.70958774, 1.2, -1.829970954), x_dir=(0.9991986389527051, 0.04002599049444876, 0), z_dir=(0, 0, 1))) as fillet_2_piece_7:
        with BuildLine():
            CenterArc((0.192155203, -0.199839728), FILLET_2_R, 92.293933115, 85.412133771)
            Line((-0.007684525, -0.19183453), (0, 0))
            ThreePointArc((0, 0), (0.092075002, -0.001843435), (0.184150005, 0))
        make_face()
    extrude(amount=5.806306003, mode=Mode.SUBTRACT)
    with BuildSketch(Plane(origin=(33.380464831, 1.3, -1.35), x_dir=(0.8960288021219349, 0.44399592990018566, 0), z_dir=(0, 0, -1))) as fillet_2_piece_8:
        with BuildLine():
            CenterArc((0.784345329, 0.197312663), FILLET_2_R, 125.396442752, 135.200454718)
            Line((0.668499217, 0.360345415), (0.656914605, 0.37664869))
            ThreePointArc((0.656914605, 0.37664869), (0.375626567, 0.208449401), (-0.008879919, 0.017920576))
            Line((-0.008879919, 0.017920576), (0.003267588, -0.019731266))
            ThreePointArc((0.003267588, -0.019731266), (0.375834726, 0.010909484), (0.748401865, -0.019731266))
            Line((0.748401865, -0.019731266), (0.751669452, 0))
        make_face()
    extrude(amount=2.998585033, mode=Mode.SUBTRACT)
    with BuildSketch(Plane(origin=(4.038710649, 1.3, -1.35), x_dir=(-1, 0, 0), z_dir=(0, 0, -1))) as fillet_2_piece_9:
        with BuildLine():
            CenterArc((0.829249689, 0.2), FILLET_2_R, 126.866992282, 143.133007718)
            ThreePointArc((0.709257803, 0.360006085), (0.370306675, 0.149115832), (0, 0))
            Line((0, 0), (0.829249689, 0))
        make_face()
    extrude(amount=3.173124223, mode=Mode.SUBTRACT)
    with BuildSketch(Plane(origin=(4.70958774, 1.2, -1.829970954), x_dir=(0, -1, 0), z_dir=(0, 0, 1))) as fillet_2_piece_10:
        with BuildLine():
            CenterArc((0.191988382, -0.2), FILLET_2_R, 90, 85.41213377)
            ThreePointArc((-0.007370786, -0.184002434), (-0.001843435, -0.092075002), (0, 0))
            Line((0, 0), (0.191988382, 0))
        make_face()
    extrude(amount=5.806306003, mode=Mode.SUBTRACT)

    # Скругление3
    fillet_3_edges = [part.edges().sort_by_distance(p)[0] for p in [
        (35.90958774, -39.9, 6.75),
        (-1.09041226, -9.3, 6.75),
        (-1.09041226, -39.9, 6.75),
        (-1.09041226, -14.9, 6.75),
        (29.35958774, -46.3, 7.925),
        (5.45958774, -46.3, 7.925),
    ]]
    fillet(fillet_3_edges, radius=FILLET_3_R)

    # Скругление4
    fillet_4_edges = [part.edges().sort_by_distance(p)[0] for p in [
        (35.90958774, -14.9, 10.5),
        (35.90958774, -9.3, 10.5),
    ]]
    fillet(fillet_4_edges, radius=FILLET_4_R)

    # Фаска1
    chamfer_1_edges = [part.edges().sort_by_distance(p)[0] for p in [
        (-1.211732603, 1.421320344, 14.5),
        (-2.09041226, -22.5, 14.5),
        (-1.211732603, -46.421320344, 14.5),
        (17.40958774, -47.3, 14.5),
        (36.030908084, -46.421320344, 14.5),
        (36.90958774, -22.5, 14.5),
        (36.030908084, 1.421320344, 14.5),
        (17.40958774, 2.3, 14.5),
    ]]
    chamfer(chamfer_1_edges, length=CHAMFER_1_SIZE)

    # Фаска2
    chamfer_2_edges = [part.edges().sort_by_distance(p)[0] for p in [
        (1.65958774, -42.7, 14.5),
        (1.65958774, -12.1, 14.5),
        (31.15958774, -42.7, 14.5),
        (31.15958774, -12.1, 14.5),
    ]]
    chamfer(chamfer_2_edges, length=CHAMFER_2_SIZE)


solid = part.part
